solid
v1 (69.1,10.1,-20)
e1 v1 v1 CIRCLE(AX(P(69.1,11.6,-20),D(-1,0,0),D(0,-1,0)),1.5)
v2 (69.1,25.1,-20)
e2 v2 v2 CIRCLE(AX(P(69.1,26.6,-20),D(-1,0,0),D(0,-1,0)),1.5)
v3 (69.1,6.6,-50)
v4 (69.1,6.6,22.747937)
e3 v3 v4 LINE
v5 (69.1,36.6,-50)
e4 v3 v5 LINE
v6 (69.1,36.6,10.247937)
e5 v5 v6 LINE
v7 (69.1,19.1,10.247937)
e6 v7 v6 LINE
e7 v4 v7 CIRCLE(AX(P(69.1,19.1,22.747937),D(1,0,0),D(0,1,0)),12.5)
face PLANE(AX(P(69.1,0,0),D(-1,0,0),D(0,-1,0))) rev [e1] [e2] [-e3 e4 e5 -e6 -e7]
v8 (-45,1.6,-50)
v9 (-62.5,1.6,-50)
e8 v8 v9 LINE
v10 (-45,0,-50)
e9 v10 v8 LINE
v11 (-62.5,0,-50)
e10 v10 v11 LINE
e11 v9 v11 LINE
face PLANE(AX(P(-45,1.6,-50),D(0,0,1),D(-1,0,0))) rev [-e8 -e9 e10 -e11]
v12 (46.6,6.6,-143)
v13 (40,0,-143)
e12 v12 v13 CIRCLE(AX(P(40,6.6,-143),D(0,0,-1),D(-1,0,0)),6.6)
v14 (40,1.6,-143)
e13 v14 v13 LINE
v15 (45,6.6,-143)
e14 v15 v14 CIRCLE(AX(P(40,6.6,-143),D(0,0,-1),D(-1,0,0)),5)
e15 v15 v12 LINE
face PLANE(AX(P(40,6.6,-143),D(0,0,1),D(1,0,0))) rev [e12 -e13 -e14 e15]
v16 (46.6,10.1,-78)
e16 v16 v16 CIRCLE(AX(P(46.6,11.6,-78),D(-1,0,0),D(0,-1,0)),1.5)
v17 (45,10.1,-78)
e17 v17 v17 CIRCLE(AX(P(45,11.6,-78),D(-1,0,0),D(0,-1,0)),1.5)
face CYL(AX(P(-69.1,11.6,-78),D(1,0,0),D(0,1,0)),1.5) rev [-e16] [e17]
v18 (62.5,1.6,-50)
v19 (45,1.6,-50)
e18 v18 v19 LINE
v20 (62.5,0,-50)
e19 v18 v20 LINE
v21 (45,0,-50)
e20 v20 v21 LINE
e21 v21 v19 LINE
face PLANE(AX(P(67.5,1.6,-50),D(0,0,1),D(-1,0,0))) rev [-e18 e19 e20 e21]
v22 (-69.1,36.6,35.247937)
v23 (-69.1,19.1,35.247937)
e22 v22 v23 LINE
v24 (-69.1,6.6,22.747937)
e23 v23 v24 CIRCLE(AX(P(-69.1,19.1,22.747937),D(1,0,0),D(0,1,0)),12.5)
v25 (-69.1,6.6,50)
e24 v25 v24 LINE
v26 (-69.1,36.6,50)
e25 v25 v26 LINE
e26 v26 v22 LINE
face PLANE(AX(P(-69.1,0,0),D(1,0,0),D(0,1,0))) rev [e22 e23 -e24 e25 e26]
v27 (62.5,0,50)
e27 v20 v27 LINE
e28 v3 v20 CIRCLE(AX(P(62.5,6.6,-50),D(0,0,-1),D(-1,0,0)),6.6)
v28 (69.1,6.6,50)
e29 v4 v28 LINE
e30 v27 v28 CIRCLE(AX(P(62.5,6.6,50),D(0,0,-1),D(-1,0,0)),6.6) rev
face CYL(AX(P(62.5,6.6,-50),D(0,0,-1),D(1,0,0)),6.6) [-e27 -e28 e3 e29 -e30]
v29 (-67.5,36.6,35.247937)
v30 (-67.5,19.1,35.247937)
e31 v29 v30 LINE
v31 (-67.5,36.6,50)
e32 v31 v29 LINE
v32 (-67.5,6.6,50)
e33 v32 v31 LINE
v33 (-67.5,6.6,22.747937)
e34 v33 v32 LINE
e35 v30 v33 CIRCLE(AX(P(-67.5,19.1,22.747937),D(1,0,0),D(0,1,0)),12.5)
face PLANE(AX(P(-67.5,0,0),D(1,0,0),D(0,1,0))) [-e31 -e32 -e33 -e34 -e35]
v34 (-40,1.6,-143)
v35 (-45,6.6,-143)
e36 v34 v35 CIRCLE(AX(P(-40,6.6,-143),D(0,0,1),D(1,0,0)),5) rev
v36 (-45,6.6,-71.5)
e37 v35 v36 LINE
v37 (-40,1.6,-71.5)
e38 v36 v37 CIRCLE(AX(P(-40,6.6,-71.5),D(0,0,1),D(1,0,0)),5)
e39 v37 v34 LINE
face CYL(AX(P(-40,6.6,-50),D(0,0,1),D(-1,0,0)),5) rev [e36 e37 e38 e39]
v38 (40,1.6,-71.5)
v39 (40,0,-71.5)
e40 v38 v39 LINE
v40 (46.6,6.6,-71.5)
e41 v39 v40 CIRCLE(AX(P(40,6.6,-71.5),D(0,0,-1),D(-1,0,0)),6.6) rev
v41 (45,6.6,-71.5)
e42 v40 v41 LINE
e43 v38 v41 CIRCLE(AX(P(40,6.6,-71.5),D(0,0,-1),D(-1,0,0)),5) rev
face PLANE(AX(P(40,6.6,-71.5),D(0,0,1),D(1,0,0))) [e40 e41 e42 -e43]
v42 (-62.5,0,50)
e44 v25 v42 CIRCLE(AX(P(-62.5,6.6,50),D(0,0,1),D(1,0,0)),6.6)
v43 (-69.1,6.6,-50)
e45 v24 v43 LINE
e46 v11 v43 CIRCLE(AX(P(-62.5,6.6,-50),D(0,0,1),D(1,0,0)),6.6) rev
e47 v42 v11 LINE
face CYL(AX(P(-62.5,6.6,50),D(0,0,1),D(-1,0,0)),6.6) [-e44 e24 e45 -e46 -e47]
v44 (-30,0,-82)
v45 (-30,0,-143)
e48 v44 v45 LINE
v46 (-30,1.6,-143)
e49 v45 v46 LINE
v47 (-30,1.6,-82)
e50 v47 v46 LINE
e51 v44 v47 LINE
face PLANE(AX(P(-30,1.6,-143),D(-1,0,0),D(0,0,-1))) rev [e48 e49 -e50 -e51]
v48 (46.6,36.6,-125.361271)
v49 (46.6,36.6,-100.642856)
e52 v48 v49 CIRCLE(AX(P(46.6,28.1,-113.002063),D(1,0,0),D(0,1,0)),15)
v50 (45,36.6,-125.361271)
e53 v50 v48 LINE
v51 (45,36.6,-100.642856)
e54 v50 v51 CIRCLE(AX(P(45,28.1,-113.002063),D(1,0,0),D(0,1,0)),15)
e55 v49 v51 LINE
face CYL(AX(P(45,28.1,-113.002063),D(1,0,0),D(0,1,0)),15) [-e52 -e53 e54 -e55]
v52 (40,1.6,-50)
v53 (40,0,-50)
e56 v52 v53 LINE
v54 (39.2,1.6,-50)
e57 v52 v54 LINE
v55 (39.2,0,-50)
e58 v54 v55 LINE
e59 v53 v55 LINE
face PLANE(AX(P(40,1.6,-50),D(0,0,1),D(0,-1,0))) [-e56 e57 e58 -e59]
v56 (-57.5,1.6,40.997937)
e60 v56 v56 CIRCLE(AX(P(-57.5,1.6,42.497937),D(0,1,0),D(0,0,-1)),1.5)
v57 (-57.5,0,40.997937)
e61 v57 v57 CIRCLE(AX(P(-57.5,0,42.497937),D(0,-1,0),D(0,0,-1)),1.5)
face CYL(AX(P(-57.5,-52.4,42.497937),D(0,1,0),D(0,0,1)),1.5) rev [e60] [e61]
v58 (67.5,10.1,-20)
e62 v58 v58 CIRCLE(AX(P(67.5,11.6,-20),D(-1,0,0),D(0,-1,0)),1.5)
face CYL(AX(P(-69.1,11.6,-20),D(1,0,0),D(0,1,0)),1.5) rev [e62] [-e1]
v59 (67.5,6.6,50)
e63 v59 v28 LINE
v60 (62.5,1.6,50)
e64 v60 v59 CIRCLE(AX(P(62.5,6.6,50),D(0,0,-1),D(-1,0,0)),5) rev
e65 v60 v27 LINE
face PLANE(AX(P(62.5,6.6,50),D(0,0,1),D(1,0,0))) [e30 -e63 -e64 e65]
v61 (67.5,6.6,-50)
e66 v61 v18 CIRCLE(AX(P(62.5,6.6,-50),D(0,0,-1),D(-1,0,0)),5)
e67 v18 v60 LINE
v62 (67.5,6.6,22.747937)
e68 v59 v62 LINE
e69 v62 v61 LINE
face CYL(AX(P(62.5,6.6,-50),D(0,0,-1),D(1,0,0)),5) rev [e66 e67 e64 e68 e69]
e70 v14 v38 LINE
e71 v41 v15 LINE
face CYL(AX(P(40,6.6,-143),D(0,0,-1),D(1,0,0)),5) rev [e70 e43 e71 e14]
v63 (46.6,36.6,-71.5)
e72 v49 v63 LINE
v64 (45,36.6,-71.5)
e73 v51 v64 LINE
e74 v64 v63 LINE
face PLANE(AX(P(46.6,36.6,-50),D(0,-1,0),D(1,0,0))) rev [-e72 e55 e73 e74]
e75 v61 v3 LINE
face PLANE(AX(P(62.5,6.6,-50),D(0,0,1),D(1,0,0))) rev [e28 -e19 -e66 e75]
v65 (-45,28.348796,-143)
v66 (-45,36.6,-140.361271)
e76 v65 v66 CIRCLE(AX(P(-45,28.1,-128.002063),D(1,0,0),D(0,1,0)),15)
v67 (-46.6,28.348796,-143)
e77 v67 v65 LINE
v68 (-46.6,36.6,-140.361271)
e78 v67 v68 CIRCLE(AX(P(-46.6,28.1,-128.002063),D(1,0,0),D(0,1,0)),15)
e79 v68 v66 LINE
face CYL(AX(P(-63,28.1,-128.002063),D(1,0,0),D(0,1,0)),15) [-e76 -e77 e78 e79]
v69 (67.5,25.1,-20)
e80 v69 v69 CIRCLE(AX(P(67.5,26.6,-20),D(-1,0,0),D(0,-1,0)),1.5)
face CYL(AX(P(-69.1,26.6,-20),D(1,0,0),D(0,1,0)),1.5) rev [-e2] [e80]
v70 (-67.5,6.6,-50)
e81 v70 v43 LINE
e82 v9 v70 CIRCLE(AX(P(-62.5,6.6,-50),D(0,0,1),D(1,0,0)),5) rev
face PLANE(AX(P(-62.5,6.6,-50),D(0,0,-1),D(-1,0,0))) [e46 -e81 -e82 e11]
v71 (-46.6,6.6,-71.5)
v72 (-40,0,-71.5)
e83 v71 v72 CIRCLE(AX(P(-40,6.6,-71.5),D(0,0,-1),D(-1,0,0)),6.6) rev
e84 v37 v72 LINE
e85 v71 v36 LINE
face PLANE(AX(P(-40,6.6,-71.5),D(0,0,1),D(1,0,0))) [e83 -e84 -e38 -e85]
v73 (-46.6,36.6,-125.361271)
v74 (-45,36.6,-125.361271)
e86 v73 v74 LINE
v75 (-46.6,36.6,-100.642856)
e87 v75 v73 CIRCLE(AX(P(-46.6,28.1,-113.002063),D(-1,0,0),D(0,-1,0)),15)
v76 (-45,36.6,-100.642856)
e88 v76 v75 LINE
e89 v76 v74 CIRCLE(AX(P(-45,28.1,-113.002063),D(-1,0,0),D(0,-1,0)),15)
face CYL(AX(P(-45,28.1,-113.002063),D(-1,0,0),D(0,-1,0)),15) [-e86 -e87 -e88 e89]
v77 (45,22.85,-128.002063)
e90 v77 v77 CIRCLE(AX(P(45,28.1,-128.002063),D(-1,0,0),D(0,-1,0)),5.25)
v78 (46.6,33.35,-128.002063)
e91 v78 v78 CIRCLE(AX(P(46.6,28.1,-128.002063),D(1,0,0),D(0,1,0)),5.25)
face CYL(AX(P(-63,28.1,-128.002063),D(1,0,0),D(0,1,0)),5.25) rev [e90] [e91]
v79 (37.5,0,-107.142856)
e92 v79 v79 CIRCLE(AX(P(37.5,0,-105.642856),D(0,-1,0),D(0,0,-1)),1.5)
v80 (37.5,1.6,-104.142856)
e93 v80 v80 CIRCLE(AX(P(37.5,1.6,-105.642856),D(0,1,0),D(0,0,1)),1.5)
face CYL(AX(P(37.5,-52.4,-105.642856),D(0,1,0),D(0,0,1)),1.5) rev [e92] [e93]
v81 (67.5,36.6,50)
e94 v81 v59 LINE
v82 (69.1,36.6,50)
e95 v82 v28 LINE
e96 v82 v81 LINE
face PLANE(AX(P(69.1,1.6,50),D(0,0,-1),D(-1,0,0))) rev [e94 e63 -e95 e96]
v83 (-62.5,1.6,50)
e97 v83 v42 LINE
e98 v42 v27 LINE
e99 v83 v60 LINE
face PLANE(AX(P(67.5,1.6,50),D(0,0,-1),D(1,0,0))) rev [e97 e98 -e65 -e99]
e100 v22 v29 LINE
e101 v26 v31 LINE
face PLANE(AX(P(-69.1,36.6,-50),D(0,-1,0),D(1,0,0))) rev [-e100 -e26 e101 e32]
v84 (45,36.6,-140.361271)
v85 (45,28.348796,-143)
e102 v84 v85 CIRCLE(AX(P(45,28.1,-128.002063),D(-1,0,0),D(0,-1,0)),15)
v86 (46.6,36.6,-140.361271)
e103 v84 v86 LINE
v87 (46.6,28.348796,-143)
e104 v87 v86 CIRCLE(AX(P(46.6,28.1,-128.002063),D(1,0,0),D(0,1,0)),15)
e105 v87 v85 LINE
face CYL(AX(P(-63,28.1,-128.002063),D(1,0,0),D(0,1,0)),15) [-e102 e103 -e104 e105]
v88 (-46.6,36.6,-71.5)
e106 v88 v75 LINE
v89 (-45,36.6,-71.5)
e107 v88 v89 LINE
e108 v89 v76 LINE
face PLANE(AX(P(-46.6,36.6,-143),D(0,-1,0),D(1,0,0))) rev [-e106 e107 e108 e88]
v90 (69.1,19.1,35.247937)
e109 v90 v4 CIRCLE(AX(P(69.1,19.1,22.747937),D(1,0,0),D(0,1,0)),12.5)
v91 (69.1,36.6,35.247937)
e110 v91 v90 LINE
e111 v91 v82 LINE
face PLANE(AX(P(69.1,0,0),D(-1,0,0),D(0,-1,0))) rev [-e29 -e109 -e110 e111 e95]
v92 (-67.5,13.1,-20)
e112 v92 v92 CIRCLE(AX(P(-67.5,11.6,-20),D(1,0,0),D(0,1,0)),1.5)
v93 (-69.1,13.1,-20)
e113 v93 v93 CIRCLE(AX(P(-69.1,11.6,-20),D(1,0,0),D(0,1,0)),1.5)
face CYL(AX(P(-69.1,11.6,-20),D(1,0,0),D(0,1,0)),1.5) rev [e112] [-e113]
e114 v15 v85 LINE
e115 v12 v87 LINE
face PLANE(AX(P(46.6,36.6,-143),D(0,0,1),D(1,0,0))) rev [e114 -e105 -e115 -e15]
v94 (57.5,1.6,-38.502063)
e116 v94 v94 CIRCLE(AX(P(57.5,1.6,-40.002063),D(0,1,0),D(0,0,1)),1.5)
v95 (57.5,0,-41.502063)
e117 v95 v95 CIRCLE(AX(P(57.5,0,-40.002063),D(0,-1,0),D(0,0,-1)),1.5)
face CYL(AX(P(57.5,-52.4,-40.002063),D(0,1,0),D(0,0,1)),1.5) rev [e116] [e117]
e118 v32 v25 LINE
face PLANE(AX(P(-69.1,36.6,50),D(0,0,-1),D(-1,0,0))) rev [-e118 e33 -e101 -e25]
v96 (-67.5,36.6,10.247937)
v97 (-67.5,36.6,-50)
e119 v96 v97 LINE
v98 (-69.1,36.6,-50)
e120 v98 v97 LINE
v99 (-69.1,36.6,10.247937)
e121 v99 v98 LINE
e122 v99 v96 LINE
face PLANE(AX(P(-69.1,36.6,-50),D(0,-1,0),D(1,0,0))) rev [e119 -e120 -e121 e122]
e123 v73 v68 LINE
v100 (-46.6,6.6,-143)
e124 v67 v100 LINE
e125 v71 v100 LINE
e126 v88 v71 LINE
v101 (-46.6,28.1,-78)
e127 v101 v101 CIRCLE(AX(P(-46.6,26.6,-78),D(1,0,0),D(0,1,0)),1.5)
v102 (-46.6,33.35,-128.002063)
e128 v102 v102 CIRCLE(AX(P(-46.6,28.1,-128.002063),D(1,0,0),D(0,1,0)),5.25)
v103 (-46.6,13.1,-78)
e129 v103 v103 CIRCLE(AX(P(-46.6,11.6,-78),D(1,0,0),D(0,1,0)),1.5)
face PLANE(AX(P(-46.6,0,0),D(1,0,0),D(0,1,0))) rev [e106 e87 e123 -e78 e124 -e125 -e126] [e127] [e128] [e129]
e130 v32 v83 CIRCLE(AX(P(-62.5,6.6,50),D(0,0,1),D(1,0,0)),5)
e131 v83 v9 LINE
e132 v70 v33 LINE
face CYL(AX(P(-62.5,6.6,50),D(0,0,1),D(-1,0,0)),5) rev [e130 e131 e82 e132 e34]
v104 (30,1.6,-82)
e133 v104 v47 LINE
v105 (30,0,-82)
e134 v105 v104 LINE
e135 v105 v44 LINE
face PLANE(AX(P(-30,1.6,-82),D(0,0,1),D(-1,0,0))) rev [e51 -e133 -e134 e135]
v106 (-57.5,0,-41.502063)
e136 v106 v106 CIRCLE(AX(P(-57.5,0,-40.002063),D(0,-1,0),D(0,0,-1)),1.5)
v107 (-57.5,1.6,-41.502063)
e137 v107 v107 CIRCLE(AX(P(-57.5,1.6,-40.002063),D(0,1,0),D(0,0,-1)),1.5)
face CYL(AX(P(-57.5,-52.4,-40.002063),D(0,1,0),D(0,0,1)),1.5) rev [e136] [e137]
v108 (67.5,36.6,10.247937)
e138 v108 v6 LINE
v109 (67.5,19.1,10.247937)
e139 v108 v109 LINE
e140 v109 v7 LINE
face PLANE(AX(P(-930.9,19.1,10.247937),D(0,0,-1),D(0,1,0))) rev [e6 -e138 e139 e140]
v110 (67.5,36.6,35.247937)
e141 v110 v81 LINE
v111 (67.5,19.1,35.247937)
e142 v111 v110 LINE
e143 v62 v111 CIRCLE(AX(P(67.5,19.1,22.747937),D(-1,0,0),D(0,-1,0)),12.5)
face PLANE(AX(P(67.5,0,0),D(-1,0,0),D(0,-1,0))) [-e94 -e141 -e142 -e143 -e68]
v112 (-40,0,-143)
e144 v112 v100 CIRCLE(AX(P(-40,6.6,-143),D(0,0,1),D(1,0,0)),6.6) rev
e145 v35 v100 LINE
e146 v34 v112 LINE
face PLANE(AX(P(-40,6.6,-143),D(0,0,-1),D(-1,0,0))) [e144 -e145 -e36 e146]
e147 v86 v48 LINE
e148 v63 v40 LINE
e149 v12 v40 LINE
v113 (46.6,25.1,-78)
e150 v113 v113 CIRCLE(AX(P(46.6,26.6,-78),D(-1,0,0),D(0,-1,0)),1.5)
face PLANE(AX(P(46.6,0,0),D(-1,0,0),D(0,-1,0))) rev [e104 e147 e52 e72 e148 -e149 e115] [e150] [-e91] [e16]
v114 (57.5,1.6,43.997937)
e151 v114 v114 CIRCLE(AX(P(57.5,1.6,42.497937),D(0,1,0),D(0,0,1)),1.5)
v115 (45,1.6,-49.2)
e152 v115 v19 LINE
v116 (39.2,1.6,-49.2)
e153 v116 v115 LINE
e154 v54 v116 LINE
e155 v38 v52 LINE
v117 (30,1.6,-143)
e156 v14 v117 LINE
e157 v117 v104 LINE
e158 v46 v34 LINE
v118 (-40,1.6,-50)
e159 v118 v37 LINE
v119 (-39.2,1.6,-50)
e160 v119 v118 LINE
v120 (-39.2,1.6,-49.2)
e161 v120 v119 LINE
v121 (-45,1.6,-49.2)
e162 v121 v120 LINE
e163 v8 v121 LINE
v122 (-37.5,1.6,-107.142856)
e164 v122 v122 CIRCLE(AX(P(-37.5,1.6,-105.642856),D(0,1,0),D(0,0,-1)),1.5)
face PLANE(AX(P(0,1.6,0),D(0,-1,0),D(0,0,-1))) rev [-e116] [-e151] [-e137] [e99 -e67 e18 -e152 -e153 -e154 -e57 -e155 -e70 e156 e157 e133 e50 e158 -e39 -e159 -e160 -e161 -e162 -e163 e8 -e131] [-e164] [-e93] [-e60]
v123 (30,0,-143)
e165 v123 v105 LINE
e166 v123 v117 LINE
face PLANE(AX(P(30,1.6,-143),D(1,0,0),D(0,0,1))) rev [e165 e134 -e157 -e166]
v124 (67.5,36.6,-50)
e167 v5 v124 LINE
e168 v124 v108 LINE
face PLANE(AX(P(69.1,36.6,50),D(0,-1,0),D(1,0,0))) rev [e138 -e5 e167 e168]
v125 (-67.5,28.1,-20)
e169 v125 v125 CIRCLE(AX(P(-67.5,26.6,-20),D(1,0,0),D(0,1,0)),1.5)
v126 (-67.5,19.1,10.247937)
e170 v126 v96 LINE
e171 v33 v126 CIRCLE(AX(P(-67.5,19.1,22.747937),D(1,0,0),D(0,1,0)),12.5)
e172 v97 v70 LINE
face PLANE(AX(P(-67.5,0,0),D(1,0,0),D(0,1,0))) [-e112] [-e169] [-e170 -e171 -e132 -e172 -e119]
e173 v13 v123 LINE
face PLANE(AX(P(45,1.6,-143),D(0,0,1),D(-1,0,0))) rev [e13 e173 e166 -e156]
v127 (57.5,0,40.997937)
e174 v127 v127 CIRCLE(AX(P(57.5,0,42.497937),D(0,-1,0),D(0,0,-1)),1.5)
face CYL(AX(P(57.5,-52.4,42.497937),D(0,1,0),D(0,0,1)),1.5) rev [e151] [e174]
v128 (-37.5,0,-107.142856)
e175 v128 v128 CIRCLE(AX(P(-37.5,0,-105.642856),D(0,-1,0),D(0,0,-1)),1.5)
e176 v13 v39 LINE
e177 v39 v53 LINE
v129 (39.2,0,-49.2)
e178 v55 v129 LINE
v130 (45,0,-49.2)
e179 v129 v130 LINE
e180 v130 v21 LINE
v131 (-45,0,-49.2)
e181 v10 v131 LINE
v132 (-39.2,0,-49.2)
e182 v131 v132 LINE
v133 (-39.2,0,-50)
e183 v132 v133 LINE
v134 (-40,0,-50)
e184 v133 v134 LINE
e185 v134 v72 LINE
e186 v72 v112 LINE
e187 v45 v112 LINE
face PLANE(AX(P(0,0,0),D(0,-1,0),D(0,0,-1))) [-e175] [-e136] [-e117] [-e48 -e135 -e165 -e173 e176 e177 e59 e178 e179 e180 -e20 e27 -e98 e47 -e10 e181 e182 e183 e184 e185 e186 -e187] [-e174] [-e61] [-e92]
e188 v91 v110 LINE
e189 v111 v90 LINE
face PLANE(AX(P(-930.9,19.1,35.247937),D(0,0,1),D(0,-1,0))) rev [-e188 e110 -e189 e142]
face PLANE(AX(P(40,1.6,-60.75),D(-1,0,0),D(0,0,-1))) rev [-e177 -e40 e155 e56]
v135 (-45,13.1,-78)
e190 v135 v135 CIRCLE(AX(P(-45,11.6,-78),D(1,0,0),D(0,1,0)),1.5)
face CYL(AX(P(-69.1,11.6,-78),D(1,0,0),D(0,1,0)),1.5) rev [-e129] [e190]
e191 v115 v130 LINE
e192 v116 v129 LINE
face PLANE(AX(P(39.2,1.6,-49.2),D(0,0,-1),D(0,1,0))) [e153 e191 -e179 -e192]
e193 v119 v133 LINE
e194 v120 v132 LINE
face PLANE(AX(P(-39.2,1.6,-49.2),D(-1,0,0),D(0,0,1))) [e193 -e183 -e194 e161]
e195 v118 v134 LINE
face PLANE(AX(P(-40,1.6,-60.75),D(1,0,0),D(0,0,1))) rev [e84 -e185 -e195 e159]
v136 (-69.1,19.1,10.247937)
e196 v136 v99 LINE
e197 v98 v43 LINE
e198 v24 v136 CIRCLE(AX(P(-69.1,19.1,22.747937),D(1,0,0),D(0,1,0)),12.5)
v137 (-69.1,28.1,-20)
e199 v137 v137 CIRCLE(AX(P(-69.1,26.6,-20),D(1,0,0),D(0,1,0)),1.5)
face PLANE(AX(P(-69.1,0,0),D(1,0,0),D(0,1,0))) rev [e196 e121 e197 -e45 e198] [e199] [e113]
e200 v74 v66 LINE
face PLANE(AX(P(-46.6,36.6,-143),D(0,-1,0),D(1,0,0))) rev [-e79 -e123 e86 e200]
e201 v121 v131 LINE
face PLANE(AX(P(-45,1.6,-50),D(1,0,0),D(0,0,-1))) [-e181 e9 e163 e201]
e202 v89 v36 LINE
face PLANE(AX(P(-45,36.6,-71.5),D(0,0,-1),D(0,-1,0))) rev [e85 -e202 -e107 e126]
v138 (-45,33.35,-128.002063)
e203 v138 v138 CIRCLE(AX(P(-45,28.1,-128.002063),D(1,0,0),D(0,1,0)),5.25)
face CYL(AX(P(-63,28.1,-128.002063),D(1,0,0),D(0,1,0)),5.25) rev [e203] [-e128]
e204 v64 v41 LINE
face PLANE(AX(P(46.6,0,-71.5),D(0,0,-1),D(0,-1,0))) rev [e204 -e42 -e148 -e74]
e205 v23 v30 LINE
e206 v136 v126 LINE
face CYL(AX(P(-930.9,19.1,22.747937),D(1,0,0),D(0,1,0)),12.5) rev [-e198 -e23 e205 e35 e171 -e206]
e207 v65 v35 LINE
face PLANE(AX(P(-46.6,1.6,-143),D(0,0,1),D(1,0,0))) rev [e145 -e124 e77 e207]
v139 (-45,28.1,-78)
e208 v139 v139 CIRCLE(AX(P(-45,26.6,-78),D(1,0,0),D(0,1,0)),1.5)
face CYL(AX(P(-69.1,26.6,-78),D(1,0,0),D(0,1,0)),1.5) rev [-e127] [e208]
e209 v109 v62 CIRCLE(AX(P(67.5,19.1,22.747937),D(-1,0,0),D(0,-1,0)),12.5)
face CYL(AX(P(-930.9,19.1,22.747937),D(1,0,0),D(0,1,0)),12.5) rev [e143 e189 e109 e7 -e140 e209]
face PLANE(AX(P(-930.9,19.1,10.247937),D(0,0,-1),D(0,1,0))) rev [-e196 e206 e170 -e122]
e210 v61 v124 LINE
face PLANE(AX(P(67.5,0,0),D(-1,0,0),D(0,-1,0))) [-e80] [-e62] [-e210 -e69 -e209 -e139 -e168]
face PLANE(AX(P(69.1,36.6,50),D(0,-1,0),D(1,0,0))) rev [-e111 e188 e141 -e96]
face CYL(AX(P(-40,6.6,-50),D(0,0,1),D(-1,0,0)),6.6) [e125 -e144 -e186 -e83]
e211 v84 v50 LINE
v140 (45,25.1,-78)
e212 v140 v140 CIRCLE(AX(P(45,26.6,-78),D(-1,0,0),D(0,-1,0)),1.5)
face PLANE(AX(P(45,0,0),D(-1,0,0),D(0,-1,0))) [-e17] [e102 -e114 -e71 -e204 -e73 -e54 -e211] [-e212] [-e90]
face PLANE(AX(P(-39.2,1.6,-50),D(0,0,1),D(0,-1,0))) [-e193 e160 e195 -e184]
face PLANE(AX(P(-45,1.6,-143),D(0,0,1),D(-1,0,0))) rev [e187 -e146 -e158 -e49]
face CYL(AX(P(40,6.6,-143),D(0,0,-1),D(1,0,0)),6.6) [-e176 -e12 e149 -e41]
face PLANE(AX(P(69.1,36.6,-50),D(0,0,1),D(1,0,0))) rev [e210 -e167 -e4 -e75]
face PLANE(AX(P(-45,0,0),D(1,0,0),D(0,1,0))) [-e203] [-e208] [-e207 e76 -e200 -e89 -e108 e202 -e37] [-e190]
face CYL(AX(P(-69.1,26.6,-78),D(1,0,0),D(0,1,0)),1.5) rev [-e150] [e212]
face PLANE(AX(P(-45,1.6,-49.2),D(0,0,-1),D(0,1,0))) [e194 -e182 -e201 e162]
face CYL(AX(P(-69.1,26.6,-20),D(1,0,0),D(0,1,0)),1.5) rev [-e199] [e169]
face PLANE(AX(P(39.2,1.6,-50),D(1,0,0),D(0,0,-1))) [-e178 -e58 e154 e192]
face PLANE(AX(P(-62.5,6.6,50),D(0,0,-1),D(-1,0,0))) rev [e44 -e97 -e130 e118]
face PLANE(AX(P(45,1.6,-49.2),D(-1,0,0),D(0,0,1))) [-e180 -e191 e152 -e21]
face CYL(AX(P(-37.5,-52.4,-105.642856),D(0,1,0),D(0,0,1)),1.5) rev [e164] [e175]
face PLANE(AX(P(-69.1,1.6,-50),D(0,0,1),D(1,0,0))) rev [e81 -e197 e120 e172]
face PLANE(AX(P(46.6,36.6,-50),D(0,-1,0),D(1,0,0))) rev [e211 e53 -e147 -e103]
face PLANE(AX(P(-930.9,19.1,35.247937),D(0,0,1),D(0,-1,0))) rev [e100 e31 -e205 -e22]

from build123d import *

# Parameters (mm, degrees)
BOSS_EXTRUDE2_DEPTH     = 1.6
EDGE_FLANGE1_START      = -50
EDGE_FLANGE1_DEPTH      = 100
EDGE_FLANGE1_START_2    = -143
EDGE_FLANGE1_2_DEPTH    = 93.8
EDGE_FLANGE1_3_DEPTH    = 0.8
EDGE_FLANGE1_4_DEPTH    = 100
EDGE_FLANGE1_5_DEPTH    = 93
CUT_EXTRUDE1_START      = -71.5
CUT_EXTRUDE1_DEPTH      = 21.5
SKETCH24_R              = 15
BOSS_EXTRUDE3_DEPTH     = 1.6
BOSS_EXTRUDE4_START     = -1.6
SKETCH25_R              = 15
BOSS_EXTRUDE4_DEPTH     = 1.6
SKETCH26_R              = 5.25
CUT_EXTRUDE2_DEPTH      = 109.6
CUT_EXTRUDE3_DEPTH      = 1000
CUT_EXTRUDE4_DEPTH      = 188.95057861
CUT_EXTRUDE4_DEPTH_BACK = 188.95057861
SKETCH30_R              = 1.5
CUT_EXTRUDE5_DEPTH      = 204.484274577
CUT_EXTRUDE5_DEPTH_BACK = 204.484274577
SKETCH32_R              = 1.5
CUT_EXTRUDE6_DEPTH      = 54


# Read off the part's stored shape, not the designer's step: Edge-Flange1, Cut-Extrude1
with BuildPart() as part:
    # Sketch1 → Boss-Extrude2 (new body)
    with BuildSketch(Plane(origin=(0, 0, 0), x_dir=(1, 0, 0), z_dir=(0, 1, 0))):
        Polygon((45, 50), (45, 143), (30, 143), (30, 82), (-30, 82), (-30, 143), (-45, 143), (-45, 50), (-67.5, 50), (-67.5, -50), (67.5, -50), (67.5, 50), align=None)
    extrude(amount=BOSS_EXTRUDE2_DEPTH)

    # Edge-Flange1 outline → Edge-Flange1 (cut)
    with BuildSketch(Plane.XY.offset(EDGE_FLANGE1_START)):
        with BuildLine():
            Line((-67.5, 0), (-62.5, 0))
            ThreePointArc((-62.5, 0), (-64.797825059, 0.412916681), (-66.808131846, 1.6))
            Line((-66.808131846, 1.6), (-67.5, 1.6))
            Line((-67.5, 1.6), (-67.5, 0))
        make_face()
        with BuildLine():
            ThreePointArc((66.808131846, 1.6), (64.797825059, 0.412916681), (62.5, 0))
            Line((62.5, 0), (67.5, 0))
            Line((67.5, 0), (67.5, 1.6))
            Line((67.5, 1.6), (66.808131846, 1.6))
        make_face()
    extrude(amount=EDGE_FLANGE1_DEPTH, mode=Mode.SUBTRACT)

    # Edge-Flange1 2 outline → Edge-Flange1 2 (cut)
    with BuildSketch(Plane.XY.offset(EDGE_FLANGE1_START_2)):
        with BuildLine():
            Line((-45, 1.6), (-45, 0))
            Line((-45, 0), (-40, 0))
            ThreePointArc((-40, 0), (-42.297825059, 0.412916681), (-44.308131846, 1.6))
            Line((-44.308131846, 1.6), (-45, 1.6))
        make_face()
        with BuildLine():
            ThreePointArc((44.308131846, 1.6), (42.297825059, 0.412916681), (40, 0))
            Line((40, 0), (45, 0))
            Line((45, 0), (45, 1.6))
            Line((45, 1.6), (44.308131846, 1.6))
        make_face()
    extrude(amount=EDGE_FLANGE1_2_DEPTH, mode=Mode.SUBTRACT)

    # Edge-Flange1 3 outline → Edge-Flange1 3 (cut)
    with BuildSketch(Plane.XY.offset(EDGE_FLANGE1_START)):
        with BuildLine():
            ThreePointArc((-44.308131846, 1.6), (-42.297825059, 0.412916681), (-40, 0))
            Line((-40, 0), (-39.2, 0))
            Line((-39.2, 0), (-39.2, 1.6))
            Line((-39.2, 1.6), (-44.308131846, 1.6))
        make_face()
        with BuildLine():
            Line((39.2, 1.6), (39.2, 0))
            Line((39.2, 0), (40, 0))
            ThreePointArc((40, 0), (42.297825059, 0.412916681), (44.308131846, 1.6))
            Line((44.308131846, 1.6), (39.2, 1.6))
        make_face()
    extrude(amount=EDGE_FLANGE1_3_DEPTH, mode=Mode.SUBTRACT)

    # Edge-Flange1 4 outline → Edge-Flange1 4 (add)
    with BuildSketch(Plane.XY.offset(EDGE_FLANGE1_START)):
        with BuildLine():
            Line((-66.808131846, 1.6), (-62.5, 1.6))
            ThreePointArc((-62.5, 1.6), (-66.035533906, 3.064466094), (-67.5, 6.6))
            Line((-67.5, 6.6), (-67.5, 36.6))
            Line((-67.5, 36.6), (-69.1, 36.6))
            Line((-69.1, 36.6), (-69.1, 6.6))
            ThreePointArc((-69.1, 6.6), (-68.499736252, 3.84987911), (-66.808131846, 1.6))
        make_face()
        with BuildLine():
            ThreePointArc((67.5, 6.6), (66.035533906, 3.064466094), (62.5, 1.6))
            Line((62.5, 1.6), (66.808131846, 1.6))
            ThreePointArc((66.808131846, 1.6), (68.499736252, 3.84987911), (69.1, 6.6))
            Line((69.1, 6.6), (69.1, 36.6))
            Line((69.1, 36.6), (67.5, 36.6))
            Line((67.5, 36.6), (67.5, 6.6))
        make_face()
    extrude(amount=EDGE_FLANGE1_4_DEPTH)

    # Edge-Flange1 5 outline → Edge-Flange1 5 (add)
    with BuildSketch(Plane.XY.offset(EDGE_FLANGE1_START_2)):
        with BuildLine():
            ThreePointArc((-46.6, 6.6), (-45.999736252, 3.84987911), (-44.308131846, 1.6))
            Line((-44.308131846, 1.6), (-40, 1.6))
            ThreePointArc((-40, 1.6), (-43.535533906, 3.064466094), (-45, 6.6))
            Line((-45, 6.6), (-45, 36.6))
            Line((-45, 36.6), (-46.6, 36.6))
            Line((-46.6, 36.6), (-46.6, 6.6))
        make_face()
        with BuildLine():
            ThreePointArc((45, 6.6), (43.535533906, 3.064466094), (40, 1.6))
            Line((40, 1.6), (44.308131846, 1.6))
            ThreePointArc((44.308131846, 1.6), (45.999736252, 3.84987911), (46.6, 6.6))
            Line((46.6, 6.6), (46.6, 36.6))
            Line((46.6, 36.6), (45, 36.6))
            Line((45, 36.6), (45, 6.6))
        make_face()
    extrude(amount=EDGE_FLANGE1_5_DEPTH)

    # Cut-Extrude1 outline → Cut-Extrude1 (cut)
    with BuildSketch(Plane.XY.offset(CUT_EXTRUDE1_START)):
        with BuildLine():
            ThreePointArc((45, 6.6), (43.535533906, 3.064466094), (40, 1.6))
            Line((40, 1.6), (40, 0))
            ThreePointArc((40, 0), (44.666904756, 1.933095244), (46.6, 6.6))
            Line((46.6, 6.6), (46.6, 36.6))
            Line((46.6, 36.6), (45, 36.6))
            Line((45, 36.6), (45, 6.6))
        make_face()
        with BuildLine():
            ThreePointArc((-46.6, 6.6), (-44.666904756, 1.933095244), (-40, 0))
            Line((-40, 0), (-40, 1.6))
            ThreePointArc((-40, 1.6), (-43.535533906, 3.064466094), (-45, 6.6))
            Line((-45, 6.6), (-45, 36.6))
            Line((-45, 36.6), (-46.6, 36.6))
            Line((-46.6, 36.6), (-46.6, 6.6))
        make_face()
    extrude(amount=CUT_EXTRUDE1_DEPTH, mode=Mode.SUBTRACT)

    # Sketch24 → Boss-Extrude3 (add)
    with BuildSketch(Plane(origin=(46.6, 0, 0), x_dir=(0, 0, -1), z_dir=(1, 0, 0))):
        with Locations((113.002063462, 28.1)):
            Circle(SKETCH24_R)
    extrude(amount=-BOSS_EXTRUDE3_DEPTH)

    # Sketch25 → Boss-Extrude4 (add)
    with BuildSketch(Plane.ZY.offset(46.6).offset(BOSS_EXTRUDE4_START)):
        with Locations((-113.002063462, 28.1)):
            Circle(SKETCH25_R)
    extrude(amount=BOSS_EXTRUDE4_DEPTH)

    # Sketch26 → Cut-Extrude2 (cut)
    with BuildSketch(Plane(origin=(46.6, 0, 0), x_dir=(0, 0, -1), z_dir=(1, 0, 0))):
        with Locations(Location((128.002063462, 28.1, 0), (0, 0, 90))):
            Circle(SKETCH26_R)
        with BuildLine():
            Line((140.361270556, 36.6), (143, 36.6))
            Line((143, 36.6), (143, 28.348796314))
            ThreePointArc((143, 28.348796314), (142.289257641, 32.669035183), (140.361270556, 36.6))
        make_face()
    extrude(amount=-CUT_EXTRUDE2_DEPTH, mode=Mode.SUBTRACT)

    # Sketch27 → Cut-Extrude3 (cut)
    with BuildSketch(Plane(origin=(69.1, 0, 0), x_dir=(0, 0, -1), z_dir=(1, 0, 0))):
        with BuildLine():
            Line((-35.247936633, 19.100000095), (-35.247936633, 36.6))
            Line((-35.247936633, 36.6), (-10.247936633, 36.6))
            Line((-10.247936633, 36.6), (-10.247936633, 19.100000095))
            ThreePointArc((-10.247936633, 19.100000095), (-22.747936633, 6.600000095), (-35.247936633, 19.100000095))
        make_face()
    extrude(amount=-CUT_EXTRUDE3_DEPTH, mode=Mode.SUBTRACT)

    # Sketch30 → Cut-Extrude4 (cut, two sides: drawn at the far end of the back side and taken through both)
    with BuildSketch(Plane(origin=(-45, 0, 0), x_dir=(0, 0, -1), z_dir=(1, 0, 0)).offset(-CUT_EXTRUDE4_DEPTH_BACK)):
        with Locations(Location((78, 26.6, 0), (0, 0, 270))):
            Circle(SKETCH30_R)
        with Locations(Location((78, 11.6, 0), (0, 0, 270))):
            Circle(SKETCH30_R)
    extrude(amount=CUT_EXTRUDE4_DEPTH + CUT_EXTRUDE4_DEPTH_BACK, mode=Mode.SUBTRACT)

    # Sketch31 → Cut-Extrude5 (cut, two sides: drawn at the far end of the back side and taken through both)
    with BuildSketch(Plane(origin=(69.1, 0, 0), x_dir=(0, 0, -1), z_dir=(1, 0, 0)).offset(-CUT_EXTRUDE5_DEPTH_BACK)):
        with BuildLine():
            ThreePointArc((21.5, 26.6), (21.060660172, 27.660660172), (20, 28.1))
            Line((20, 28.1), (20, 25.1))
            ThreePointArc((20, 25.1), (21.060660172, 25.539339828), (21.5, 26.6))
        make_face()
        with BuildLine():
            Line((20, 25.1), (20, 28.1))
            ThreePointArc((20, 28.1), (18.5, 26.6), (20, 25.1))
        make_face()
        with BuildLine():
            ThreePointArc((21.5, 11.6), (21.060660172, 12.660660172), (20, 13.1))
            Line((20, 13.1), (20, 10.1))
            ThreePointArc((20, 10.1), (21.060660172, 10.539339828), (21.5, 11.6))
        make_face()
        with BuildLine():
            Line((20, 10.1), (20, 13.1))
            ThreePointArc((20, 13.1), (18.5, 11.6), (20, 10.1))
        make_face()
    extrude(amount=CUT_EXTRUDE5_DEPTH + CUT_EXTRUDE5_DEPTH_BACK, mode=Mode.SUBTRACT)

    # Sketch32 → Cut-Extrude6 (cut)
    with BuildSketch(Plane(origin=(0, 1.6, 0), x_dir=(1, 0, 0), z_dir=(0, 1, 0))):
        with Locations(Location((37.5, 105.642856368, 0), (0, 0, 270))):
            Circle(SKETCH32_R)
        with Locations(Location((57.5, 40.002063462, 0), (0, 0, 270))):
            Circle(SKETCH32_R)
        with Locations(Location((57.5, -42.497936538, 0), (0, 0, 270))):
            Circle(SKETCH32_R)
        with Locations(Location((-37.5, 105.642856368, 0), (0, 0, 90))):
            Circle(SKETCH32_R)
        with Locations(Location((-57.5, 40.002063462, 0), (0, 0, 90))):
            Circle(SKETCH32_R)
        with Locations(Location((-57.5, -42.497936538, 0), (0, 0, 90))):
            Circle(SKETCH32_R)
    extrude(amount=-CUT_EXTRUDE6_DEPTH, mode=Mode.SUBTRACT)


solid = part.part
